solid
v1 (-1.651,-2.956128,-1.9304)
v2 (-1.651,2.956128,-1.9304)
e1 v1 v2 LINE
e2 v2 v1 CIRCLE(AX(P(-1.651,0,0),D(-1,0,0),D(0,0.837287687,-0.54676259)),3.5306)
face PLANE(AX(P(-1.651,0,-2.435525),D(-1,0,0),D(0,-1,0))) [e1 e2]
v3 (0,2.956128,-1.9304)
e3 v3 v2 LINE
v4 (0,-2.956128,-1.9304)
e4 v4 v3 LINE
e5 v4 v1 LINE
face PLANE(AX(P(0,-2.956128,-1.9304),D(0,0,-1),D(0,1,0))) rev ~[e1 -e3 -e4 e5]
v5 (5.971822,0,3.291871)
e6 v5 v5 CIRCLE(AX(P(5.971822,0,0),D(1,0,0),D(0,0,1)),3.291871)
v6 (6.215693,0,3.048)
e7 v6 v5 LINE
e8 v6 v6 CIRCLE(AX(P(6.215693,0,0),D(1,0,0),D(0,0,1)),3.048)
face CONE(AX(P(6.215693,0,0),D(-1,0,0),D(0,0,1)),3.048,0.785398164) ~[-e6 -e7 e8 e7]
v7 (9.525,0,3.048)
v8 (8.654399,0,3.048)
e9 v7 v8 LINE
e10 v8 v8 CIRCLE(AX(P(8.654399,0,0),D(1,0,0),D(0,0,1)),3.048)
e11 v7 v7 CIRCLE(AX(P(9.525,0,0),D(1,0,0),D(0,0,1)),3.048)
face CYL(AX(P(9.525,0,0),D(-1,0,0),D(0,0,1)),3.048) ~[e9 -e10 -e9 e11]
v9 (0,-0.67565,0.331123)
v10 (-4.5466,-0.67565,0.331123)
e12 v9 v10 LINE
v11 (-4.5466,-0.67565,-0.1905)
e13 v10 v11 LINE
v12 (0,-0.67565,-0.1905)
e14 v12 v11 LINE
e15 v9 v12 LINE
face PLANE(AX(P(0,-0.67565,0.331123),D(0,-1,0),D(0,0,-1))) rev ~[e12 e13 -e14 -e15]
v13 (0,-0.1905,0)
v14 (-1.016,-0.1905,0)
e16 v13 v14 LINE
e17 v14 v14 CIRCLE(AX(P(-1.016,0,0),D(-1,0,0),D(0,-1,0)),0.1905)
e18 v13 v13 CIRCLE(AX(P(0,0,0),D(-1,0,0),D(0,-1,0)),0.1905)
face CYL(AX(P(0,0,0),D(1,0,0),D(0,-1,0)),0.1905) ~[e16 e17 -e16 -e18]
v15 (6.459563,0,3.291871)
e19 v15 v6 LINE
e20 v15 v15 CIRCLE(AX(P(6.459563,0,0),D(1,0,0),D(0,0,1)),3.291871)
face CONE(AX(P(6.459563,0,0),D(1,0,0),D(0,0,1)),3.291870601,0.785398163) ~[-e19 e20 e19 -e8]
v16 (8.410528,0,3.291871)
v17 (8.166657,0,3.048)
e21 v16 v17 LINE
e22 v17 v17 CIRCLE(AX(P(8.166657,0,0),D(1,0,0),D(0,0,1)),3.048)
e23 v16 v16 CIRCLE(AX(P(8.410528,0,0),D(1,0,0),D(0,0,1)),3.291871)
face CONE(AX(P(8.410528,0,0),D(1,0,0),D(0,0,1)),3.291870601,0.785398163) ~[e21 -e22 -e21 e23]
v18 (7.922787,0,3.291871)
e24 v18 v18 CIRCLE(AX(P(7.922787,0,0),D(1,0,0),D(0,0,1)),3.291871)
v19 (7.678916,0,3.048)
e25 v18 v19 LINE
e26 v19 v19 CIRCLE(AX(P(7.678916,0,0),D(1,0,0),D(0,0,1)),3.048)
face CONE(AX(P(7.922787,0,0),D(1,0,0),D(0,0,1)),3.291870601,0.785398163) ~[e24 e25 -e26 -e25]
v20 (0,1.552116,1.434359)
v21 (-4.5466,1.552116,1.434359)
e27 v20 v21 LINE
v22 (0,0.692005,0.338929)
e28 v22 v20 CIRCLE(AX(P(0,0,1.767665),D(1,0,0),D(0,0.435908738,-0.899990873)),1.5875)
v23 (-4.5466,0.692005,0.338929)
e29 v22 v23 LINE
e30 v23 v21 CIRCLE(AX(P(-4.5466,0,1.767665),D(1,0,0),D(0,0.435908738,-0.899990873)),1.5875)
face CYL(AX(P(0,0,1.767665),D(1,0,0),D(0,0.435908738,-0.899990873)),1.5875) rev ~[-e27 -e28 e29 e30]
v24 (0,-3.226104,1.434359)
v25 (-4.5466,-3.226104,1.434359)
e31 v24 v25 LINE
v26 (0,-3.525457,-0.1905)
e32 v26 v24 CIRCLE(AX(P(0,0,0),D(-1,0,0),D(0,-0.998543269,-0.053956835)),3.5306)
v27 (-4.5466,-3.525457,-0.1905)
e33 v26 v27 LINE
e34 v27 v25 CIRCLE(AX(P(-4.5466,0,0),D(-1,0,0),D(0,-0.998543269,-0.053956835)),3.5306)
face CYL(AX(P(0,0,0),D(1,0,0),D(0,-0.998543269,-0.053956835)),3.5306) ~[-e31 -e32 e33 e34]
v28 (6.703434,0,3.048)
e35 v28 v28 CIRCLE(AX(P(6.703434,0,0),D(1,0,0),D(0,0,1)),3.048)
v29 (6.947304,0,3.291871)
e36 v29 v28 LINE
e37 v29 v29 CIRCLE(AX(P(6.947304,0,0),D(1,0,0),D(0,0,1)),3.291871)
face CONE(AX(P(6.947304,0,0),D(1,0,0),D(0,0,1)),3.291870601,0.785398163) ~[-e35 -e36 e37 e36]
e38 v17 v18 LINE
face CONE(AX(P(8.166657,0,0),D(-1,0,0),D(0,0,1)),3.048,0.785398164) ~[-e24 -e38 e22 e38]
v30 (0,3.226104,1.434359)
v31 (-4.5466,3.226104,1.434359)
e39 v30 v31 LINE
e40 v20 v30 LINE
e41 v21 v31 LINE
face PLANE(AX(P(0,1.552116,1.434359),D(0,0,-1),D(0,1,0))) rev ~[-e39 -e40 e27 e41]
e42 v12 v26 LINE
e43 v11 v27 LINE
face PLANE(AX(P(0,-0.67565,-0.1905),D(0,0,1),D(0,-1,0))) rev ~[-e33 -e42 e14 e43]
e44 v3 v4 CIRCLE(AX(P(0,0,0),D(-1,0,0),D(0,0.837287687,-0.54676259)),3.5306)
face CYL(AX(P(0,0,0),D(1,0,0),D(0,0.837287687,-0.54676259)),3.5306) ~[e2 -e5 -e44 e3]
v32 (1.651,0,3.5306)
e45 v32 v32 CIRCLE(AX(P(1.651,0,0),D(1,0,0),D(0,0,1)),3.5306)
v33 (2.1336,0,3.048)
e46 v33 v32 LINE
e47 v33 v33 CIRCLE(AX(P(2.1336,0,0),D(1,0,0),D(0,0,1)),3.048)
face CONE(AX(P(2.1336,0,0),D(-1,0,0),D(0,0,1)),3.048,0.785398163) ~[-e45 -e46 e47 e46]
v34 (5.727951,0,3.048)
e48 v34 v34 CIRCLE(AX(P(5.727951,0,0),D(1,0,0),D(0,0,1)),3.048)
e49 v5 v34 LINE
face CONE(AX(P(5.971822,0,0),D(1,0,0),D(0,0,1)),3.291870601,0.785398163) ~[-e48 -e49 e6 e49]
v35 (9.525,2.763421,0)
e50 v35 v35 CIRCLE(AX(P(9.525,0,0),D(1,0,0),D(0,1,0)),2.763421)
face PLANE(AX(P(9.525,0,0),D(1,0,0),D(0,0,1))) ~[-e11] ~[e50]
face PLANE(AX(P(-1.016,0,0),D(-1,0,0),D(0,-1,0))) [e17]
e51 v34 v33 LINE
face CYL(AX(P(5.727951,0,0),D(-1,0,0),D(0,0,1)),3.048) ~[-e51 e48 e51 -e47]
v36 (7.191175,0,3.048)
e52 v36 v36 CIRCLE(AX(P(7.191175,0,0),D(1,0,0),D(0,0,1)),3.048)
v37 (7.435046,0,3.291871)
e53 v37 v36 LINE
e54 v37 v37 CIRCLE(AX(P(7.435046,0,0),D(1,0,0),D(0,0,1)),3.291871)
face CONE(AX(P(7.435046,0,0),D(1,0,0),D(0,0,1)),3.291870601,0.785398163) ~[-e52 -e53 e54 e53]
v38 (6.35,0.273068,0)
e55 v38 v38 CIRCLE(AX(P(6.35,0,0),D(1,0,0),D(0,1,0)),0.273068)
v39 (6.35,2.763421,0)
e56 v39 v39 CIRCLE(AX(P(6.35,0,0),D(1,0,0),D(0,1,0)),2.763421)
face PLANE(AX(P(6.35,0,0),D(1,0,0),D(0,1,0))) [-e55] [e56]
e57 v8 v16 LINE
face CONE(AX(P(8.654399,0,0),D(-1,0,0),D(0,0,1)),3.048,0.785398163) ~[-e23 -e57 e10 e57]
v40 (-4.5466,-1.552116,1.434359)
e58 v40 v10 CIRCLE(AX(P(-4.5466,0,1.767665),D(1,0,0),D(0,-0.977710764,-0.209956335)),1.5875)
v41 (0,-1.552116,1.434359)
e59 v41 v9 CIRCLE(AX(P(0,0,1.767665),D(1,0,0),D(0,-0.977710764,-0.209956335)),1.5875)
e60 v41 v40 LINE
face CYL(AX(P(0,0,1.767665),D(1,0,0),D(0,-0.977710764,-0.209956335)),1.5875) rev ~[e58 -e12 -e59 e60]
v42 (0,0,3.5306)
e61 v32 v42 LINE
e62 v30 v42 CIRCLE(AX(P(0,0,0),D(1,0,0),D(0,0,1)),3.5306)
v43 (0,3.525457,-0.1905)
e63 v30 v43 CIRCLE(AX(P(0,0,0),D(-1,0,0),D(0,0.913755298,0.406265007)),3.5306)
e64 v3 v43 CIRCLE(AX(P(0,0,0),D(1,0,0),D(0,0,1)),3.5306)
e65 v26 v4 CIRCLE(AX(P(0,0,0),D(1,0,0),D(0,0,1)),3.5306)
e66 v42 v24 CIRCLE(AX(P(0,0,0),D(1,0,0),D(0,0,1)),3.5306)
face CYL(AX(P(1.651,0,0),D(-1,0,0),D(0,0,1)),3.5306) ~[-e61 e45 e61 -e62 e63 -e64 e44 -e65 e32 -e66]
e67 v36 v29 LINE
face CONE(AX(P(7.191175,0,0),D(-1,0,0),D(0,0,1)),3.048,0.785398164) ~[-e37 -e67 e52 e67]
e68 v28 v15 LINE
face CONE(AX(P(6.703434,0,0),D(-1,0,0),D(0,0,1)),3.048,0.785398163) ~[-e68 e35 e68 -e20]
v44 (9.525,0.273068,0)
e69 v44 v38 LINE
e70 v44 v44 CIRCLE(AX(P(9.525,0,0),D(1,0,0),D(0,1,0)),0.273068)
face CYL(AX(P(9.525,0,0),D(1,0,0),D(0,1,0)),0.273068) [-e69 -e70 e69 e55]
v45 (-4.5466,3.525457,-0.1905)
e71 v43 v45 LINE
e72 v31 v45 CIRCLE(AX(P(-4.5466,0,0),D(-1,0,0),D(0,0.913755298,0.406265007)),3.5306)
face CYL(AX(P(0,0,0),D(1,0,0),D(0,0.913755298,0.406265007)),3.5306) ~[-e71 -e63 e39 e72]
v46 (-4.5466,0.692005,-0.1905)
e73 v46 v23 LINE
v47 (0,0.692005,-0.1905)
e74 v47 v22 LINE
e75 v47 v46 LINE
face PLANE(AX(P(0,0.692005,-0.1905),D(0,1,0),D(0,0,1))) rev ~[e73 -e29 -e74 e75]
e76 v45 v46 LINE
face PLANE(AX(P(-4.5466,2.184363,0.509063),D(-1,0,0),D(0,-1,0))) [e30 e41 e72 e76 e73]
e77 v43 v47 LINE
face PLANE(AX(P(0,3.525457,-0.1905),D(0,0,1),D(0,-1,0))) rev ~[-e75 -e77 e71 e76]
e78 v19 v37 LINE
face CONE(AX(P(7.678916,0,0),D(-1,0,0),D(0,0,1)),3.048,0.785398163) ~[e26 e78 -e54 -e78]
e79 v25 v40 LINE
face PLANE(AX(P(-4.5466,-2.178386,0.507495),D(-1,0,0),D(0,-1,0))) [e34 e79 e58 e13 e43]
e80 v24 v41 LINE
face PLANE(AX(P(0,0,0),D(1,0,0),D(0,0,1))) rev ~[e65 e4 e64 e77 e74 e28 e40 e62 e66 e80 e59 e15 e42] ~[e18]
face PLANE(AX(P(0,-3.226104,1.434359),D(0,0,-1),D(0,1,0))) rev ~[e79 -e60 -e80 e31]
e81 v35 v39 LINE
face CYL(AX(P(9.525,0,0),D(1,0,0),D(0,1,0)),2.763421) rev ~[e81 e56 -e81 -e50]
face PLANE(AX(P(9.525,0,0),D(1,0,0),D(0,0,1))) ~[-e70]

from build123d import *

# Parameters (mm, degrees)
F2_R     = 2.7634205328
F2_R_2   = 0.2730680528
F3_DEPTH = 3.175
F4_R     = 0.1905
F5_DEPTH = 1.016
F7_DEPTH = 1.651
F9_DEPTH = 4.5466


# Not quite as in the source:
# - after a boolean that leaves OpenCascade's solid faulty, fix() repairs it


with BuildPart() as f1:
    # F0 (on Front) → F1 (revolve)
    with BuildSketch(Plane.XZ):
        Polygon((0, 3.5306), (0, 0), (9.525, 0), (9.525, 3.048), (8.6543986211, 3.048), (8.4105280196, 3.2918706015), (8.1666574181, 3.048), (7.9227868167, 3.2918706015), (7.6789162152, 3.048), (7.4350456137, 3.2918706015), (7.1911750122, 3.048), (6.9473044108, 3.2918706015), (6.7034338093, 3.048), (6.4595632078, 3.2918706015), (6.2156926063, 3.048), (5.9718220049, 3.2918706015), (5.7279514034, 3.048), (2.1336, 3.048), (1.651, 3.5306), align=None)
    revolve(axis=Axis((4.7625, 0, 0), (1, 0, 0)))

    # F2 (on face) → F3 (cut)
    with BuildSketch(Plane.YZ.offset(9.525)):
        Circle(F2_R)
        Circle(F2_R_2, mode=Mode.SUBTRACT)
    extrude(amount=-F3_DEPTH, mode=Mode.SUBTRACT)

    # F4 (on face) → F5 (join)
    with BuildSketch(Plane(origin=(0, 0, 0), x_dir=(0, -1, 0), z_dir=(-1, 0, 0))):
        Circle(F4_R)
    extrude(amount=F5_DEPTH)

    # F6 (on face) → F7 (join)
    with BuildSketch(Plane(origin=(0, 0, 0), x_dir=(0, -1, 0), z_dir=(-1, 0, 0))):
        with BuildLine():
            ThreePointArc((-2.9561279066, -1.9304), (0, -3.5306), (2.9561279066, -1.9304))
            Line((2.9561279066, -1.9304), (-2.9561279066, -1.9304))
        make_face()
    extrude(amount=F7_DEPTH)

    add(f1.part.fix(), mode=Mode.REPLACE)

    # F8 (on face) → F9 (join)
    with BuildSketch(Plane(origin=(0, 0, 0), x_dir=(0, -1, 0), z_dir=(-1, 0, 0))):
        with BuildLine():
            Line((-1.5521158375, 1.4343592338), (-3.226104454, 1.4343592338))
            ThreePointArc((-3.226104454, 1.4343592338), (-3.4721660307, 0.6396869664), (-3.5254568654, -0.1905))
            Line((-3.5254568654, -0.1905), (-0.6920051213, -0.1905))
            Line((-0.6920051213, -0.1905), (-0.6920051213, 0.3389294034))
            ThreePointArc((-0.6920051213, 0.3389294034), (-1.2486037593, 0.7872849365), (-1.5521158375, 1.4343592338))
        make_face()
        with BuildLine():
            Line((0.6756495639, -0.1905), (3.5254568654, -0.1905))
            ThreePointArc((3.5254568654, -0.1905), (3.4721660307, 0.6396869664), (3.226104454, 1.4343592338))
            Line((3.226104454, 1.4343592338), (1.5521158375, 1.4343592338))
            ThreePointArc((1.5521158375, 1.4343592338), (1.2429873115, 0.7801737537), (0.6756495639, 0.3311225672))
            Line((0.6756495639, 0.3311225672), (0.6756495639, -0.1905))
        make_face()
    extrude(amount=F9_DEPTH)


solid = f1.part
